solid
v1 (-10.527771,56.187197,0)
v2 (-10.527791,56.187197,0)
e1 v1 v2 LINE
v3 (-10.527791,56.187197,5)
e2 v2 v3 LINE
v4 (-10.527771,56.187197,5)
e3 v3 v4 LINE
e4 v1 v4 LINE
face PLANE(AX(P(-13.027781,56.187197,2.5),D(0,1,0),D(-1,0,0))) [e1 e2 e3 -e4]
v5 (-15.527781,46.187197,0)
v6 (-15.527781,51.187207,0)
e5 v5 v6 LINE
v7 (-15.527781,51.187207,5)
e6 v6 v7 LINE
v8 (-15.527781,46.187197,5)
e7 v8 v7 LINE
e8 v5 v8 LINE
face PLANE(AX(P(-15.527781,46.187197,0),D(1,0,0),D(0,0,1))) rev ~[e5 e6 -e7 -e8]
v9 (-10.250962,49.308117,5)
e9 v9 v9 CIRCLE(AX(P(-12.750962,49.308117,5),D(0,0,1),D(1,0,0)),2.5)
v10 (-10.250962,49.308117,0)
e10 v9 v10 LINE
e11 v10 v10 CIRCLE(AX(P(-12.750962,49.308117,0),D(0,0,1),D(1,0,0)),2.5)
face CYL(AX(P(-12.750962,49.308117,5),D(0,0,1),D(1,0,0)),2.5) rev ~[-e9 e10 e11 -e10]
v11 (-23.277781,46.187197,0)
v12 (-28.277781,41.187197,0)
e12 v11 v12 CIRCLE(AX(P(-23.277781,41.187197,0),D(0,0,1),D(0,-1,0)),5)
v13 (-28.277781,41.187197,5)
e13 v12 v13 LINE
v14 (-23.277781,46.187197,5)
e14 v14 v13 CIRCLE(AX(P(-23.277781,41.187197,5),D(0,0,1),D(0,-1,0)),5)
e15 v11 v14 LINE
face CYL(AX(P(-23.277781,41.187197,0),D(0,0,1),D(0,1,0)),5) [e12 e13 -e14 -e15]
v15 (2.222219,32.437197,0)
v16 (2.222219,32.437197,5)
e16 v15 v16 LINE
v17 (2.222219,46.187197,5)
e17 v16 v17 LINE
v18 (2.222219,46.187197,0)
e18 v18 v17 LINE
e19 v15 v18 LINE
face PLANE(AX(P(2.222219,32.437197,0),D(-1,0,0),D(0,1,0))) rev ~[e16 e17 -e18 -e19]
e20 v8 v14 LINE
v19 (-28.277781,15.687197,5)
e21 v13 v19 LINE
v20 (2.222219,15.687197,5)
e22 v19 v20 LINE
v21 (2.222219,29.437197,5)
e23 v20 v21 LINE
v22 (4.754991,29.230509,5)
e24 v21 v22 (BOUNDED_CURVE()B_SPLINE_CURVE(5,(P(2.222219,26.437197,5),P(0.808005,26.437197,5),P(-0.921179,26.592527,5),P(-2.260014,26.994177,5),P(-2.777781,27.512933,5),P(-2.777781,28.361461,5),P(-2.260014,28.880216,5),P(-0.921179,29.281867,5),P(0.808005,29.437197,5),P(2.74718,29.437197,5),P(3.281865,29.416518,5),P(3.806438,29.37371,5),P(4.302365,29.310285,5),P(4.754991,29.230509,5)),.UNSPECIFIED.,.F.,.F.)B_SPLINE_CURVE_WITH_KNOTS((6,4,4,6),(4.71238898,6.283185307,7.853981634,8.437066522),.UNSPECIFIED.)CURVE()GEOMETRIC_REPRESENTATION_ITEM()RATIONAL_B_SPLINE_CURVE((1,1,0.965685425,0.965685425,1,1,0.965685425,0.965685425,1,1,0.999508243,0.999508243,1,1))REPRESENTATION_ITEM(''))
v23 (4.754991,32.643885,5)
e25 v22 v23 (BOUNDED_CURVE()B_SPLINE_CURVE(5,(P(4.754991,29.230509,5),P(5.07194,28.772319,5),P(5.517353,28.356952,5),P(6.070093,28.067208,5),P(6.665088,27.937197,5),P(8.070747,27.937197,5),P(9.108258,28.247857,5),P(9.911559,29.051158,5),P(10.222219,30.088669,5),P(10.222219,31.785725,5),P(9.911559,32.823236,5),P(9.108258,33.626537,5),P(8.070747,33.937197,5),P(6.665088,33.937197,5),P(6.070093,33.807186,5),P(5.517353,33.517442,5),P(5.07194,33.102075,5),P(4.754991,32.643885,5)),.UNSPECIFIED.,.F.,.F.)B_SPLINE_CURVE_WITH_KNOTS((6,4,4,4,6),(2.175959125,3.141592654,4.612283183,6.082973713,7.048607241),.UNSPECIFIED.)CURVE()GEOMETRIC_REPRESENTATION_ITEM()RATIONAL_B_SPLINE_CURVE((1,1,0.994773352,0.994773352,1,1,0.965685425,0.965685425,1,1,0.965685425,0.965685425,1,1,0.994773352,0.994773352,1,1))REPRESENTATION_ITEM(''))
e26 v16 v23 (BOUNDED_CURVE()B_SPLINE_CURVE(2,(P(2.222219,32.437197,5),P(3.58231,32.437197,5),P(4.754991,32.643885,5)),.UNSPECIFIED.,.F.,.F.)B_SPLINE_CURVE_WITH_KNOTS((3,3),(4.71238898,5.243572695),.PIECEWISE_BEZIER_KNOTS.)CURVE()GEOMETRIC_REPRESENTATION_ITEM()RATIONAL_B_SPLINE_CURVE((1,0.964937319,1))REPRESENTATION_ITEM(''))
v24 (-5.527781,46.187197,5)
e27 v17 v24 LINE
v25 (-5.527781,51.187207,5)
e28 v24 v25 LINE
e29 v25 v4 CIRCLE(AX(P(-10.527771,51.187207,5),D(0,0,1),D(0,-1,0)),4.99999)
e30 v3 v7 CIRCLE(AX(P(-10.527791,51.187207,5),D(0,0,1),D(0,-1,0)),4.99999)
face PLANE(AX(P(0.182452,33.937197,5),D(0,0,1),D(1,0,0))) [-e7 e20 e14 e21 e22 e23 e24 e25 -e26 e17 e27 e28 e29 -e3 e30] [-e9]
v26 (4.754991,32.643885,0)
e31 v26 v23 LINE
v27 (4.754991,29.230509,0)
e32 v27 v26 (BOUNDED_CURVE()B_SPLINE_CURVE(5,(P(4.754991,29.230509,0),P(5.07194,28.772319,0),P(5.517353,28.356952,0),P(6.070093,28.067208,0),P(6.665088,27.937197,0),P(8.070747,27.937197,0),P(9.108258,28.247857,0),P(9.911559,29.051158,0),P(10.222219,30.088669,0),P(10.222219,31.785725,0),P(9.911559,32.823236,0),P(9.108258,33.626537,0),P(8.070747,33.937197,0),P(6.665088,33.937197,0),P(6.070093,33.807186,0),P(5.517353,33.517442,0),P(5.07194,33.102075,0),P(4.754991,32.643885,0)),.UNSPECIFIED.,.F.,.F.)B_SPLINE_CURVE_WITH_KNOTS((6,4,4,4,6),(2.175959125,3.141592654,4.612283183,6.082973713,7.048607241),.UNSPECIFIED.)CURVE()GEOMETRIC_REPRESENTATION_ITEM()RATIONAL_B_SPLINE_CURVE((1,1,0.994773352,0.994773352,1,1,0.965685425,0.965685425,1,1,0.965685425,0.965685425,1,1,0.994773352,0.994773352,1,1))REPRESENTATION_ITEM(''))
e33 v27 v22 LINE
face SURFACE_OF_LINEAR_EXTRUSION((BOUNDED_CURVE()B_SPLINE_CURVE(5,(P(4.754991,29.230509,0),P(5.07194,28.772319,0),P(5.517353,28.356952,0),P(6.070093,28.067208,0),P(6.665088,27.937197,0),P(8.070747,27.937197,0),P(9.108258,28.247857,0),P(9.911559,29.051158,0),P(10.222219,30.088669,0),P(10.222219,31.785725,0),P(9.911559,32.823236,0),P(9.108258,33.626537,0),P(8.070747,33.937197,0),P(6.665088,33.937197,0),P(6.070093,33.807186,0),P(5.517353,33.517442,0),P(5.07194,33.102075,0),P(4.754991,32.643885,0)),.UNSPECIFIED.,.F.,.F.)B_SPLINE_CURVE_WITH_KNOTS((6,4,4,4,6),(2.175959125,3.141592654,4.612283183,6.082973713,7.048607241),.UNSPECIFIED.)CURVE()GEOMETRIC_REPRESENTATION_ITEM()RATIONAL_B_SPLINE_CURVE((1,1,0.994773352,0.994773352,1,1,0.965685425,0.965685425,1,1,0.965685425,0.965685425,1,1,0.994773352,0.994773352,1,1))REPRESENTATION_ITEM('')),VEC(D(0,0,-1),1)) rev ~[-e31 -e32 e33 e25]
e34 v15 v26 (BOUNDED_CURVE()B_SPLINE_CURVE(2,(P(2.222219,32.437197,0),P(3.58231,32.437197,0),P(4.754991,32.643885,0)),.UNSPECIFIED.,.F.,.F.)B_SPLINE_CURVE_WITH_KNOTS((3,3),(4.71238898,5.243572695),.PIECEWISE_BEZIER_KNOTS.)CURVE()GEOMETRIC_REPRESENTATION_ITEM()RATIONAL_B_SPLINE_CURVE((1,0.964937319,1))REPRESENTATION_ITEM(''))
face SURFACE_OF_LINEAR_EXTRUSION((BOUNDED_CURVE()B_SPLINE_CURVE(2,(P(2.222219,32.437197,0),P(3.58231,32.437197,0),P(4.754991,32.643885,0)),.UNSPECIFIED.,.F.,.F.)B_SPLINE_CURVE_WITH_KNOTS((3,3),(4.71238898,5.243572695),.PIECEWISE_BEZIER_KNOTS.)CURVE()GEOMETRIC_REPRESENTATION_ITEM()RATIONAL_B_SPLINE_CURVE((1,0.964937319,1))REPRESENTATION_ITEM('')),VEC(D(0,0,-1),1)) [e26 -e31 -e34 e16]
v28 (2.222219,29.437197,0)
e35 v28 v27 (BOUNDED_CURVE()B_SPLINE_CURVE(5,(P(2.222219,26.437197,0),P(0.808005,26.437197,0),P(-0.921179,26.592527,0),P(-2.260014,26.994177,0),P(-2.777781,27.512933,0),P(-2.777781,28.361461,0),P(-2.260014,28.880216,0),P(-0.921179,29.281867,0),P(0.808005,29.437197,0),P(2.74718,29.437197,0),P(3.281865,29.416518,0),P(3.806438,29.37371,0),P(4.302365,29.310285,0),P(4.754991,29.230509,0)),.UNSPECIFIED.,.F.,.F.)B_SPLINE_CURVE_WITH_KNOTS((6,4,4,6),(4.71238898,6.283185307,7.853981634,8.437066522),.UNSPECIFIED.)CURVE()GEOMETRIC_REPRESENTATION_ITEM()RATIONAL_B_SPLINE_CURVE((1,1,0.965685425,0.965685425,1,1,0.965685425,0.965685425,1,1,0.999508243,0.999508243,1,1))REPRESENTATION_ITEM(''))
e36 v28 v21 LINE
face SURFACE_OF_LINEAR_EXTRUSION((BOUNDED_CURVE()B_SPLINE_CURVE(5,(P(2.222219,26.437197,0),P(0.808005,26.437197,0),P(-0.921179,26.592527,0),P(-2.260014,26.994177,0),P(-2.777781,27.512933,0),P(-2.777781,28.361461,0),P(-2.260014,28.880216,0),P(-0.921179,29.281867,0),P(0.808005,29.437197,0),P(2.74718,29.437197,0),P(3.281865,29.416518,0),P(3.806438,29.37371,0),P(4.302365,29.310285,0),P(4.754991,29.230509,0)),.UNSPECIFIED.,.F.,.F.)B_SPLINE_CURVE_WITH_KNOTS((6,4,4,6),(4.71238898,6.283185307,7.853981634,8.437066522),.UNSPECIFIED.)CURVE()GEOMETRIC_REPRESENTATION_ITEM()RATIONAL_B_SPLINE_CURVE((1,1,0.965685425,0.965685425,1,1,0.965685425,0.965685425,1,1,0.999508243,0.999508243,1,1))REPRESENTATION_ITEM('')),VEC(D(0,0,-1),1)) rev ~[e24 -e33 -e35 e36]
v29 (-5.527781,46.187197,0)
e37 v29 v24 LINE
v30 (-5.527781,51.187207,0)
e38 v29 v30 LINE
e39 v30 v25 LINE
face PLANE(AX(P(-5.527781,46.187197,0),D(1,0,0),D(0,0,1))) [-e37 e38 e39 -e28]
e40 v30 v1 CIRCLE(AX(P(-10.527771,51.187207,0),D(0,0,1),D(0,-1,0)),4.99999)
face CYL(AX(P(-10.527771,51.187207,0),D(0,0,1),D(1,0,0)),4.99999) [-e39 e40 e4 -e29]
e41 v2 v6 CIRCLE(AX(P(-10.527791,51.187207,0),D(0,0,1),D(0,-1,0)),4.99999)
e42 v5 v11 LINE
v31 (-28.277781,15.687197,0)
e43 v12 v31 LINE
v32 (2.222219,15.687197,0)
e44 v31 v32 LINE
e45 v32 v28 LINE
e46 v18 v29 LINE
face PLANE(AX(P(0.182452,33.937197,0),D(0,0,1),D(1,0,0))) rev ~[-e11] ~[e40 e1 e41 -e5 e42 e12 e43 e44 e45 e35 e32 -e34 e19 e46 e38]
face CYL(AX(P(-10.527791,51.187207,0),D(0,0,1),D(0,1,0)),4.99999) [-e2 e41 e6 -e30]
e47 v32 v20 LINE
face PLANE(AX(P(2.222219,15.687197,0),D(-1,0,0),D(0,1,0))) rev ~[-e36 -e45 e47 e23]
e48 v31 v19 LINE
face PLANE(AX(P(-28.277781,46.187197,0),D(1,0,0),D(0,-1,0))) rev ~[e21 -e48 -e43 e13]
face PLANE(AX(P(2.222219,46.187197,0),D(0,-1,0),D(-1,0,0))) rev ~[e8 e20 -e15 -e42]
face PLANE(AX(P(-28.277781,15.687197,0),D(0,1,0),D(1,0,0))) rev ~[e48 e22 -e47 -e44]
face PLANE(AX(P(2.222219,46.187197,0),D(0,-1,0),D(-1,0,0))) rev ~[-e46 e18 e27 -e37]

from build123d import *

# Parameters (mm, degrees)
F1_DEPTH = 5
F2_R     = 5
F3_W     = 5
F3_H     = 5
F4_DEPTH = 10
F5_R     = 4.99999
F6_R     = 2.5
F7_DEPTH = 25


# Not quite as in the source:
# - a fillet or chamfer is up to 0.001 mm smaller than in the source, because OpenCascade refuses the exact size


with BuildPart() as f1:
    # F0 (on Top) → F1 (new body)
    with BuildSketch(Plane.XY):
        with BuildLine():
            Line((2.2222189992, 32.4371969399), (2.2222189992, 33.9371969399))
            Line((2.2222189992, 33.9371969399), (2.2222189992, 35.4371969399))
            add(Edge.make_bspline(
                [(2.2222189992, 35.4371969399), (-2.7777810008, 35.4371969399), (-2.7777810008, 33.9371969399), (-2.7777810008, 32.4371969399), (2.2222189992, 32.4371969399)],
                knots=[1.5707963268, 1.5707963268, 1.5707963268, 3.1415926536, 3.1415926536, 4.7123889804, 4.7123889804, 4.7123889804], degree=2, weights=[1, 0.7071067812, 1, 0.7071067812, 1]))
        make_face()
        with BuildLine():
            add(Edge.make_bspline(
                [(2.2222189992, 32.4371969399), (3.5823095151, 32.4371969399), (4.7549905191, 32.6438848513)],
                knots=[4.7123889804, 4.7123889804, 4.7123889804, 5.2435726948, 5.2435726948, 5.2435726948], degree=2, weights=[1, 0.964937319, 1]))
            Line((2.2222189992, 32.4371969399), (2.2222189992, 30.9371969399))
            Line((2.2222189992, 30.9371969399), (4.2222189992, 30.9371969399))
            add(Edge.make_bspline(
                [(4.7549905191, 32.6438848513), (4.2222189992, 31.8736977196), (4.2222189992, 30.9371969399)],
                knots=[0.9656335287, 0.9656335287, 0.9656335287, 1.5707963268, 1.5707963268, 1.5707963268], degree=2, weights=[1, 0.9545704514, 1]))
        make_face()
        with BuildLine():
            Line((2.2222189992, 30.9371969399), (2.2222189992, 32.4371969399))
            add(Edge.make_bspline(
                [(2.2222189992, 35.4371969399), (-2.7777810008, 35.4371969399), (-2.7777810008, 33.9371969399), (-2.7777810008, 32.4371969399), (2.2222189992, 32.4371969399)],
                knots=[1.5707963268, 1.5707963268, 1.5707963268, 3.1415926536, 3.1415926536, 4.7123889804, 4.7123889804, 4.7123889804], degree=2, weights=[1, 0.7071067812, 1, 0.7071067812, 1]))
            Line((2.2222189992, 35.4371969399), (2.2222189992, 46.1871969399))
            Line((2.2222189992, 46.1871969399), (-28.2777810008, 46.1871969399))
            Line((-28.2777810008, 46.1871969399), (-28.2777810008, 15.6871969399))
            Line((-28.2777810008, 15.6871969399), (2.2222189992, 15.6871969399))
            Line((2.2222189992, 15.6871969399), (2.2222189992, 26.4371969399))
            add(Edge.make_bspline(
                [(2.2222189992, 29.4371969399), (-2.7777810008, 29.4371969399), (-2.7777810008, 27.9371969399), (-2.7777810008, 26.4371969399), (2.2222189992, 26.4371969399)],
                knots=[4.7123889804, 4.7123889804, 4.7123889804, 6.2831853072, 6.2831853072, 7.853981634, 7.853981634, 7.853981634], degree=2, weights=[1, 0.7071067812, 1, 0.7071067812, 1]))
            Line((2.2222189992, 29.4371969399), (2.2222189992, 30.9371969399))
        make_face()
        with BuildLine():
            Line((4.2222189992, 30.9371969399), (2.2222189992, 30.9371969399))
            Line((2.2222189992, 30.9371969399), (2.2222189992, 29.4371969399))
            add(Edge.make_bspline(
                [(4.7549905191, 29.2305090285), (3.5823095151, 29.4371969399), (2.2222189992, 29.4371969399)],
                knots=[4.181205266, 4.181205266, 4.181205266, 4.7123889804, 4.7123889804, 4.7123889804], degree=2, weights=[1, 0.964937319, 1]))
            add(Edge.make_bspline(
                [(4.2222189992, 30.9371969399), (4.2222189992, 30.0006961603), (4.7549905191, 29.2305090285)],
                knots=[1.5707963268, 1.5707963268, 1.5707963268, 2.1759591249, 2.1759591249, 2.1759591249], degree=2, weights=[1, 0.9545704514, 1]))
        make_face()
        with BuildLine():
            add(Edge.make_bspline(
                [(7.2222189992, 33.9371969399), (5.6496300407, 33.9371969399), (4.7549905191, 32.6438848513)],
                knots=[0, 0, 0, 0.9656335287, 0.9656335287, 0.9656335287], degree=2, weights=[1, 0.8856906826, 1]))
            add(Edge.make_bspline(
                [(4.7549905191, 32.6438848513), (7.2222189992, 33.0787399396), (7.2222189992, 33.9371969399)],
                knots=[5.2435726948, 5.2435726948, 5.2435726948, 6.2831853072, 6.2831853072, 6.2831853072], degree=2, weights=[1, 0.867915406, 1]))
        make_face()
        with BuildLine():
            add(Edge.make_bspline(
                [(4.7549905191, 32.6438848513), (7.2222189992, 33.0787399396), (7.2222189992, 33.9371969399)],
                knots=[5.2435726948, 5.2435726948, 5.2435726948, 6.2831853072, 6.2831853072, 6.2831853072], degree=2, weights=[1, 0.867915406, 1]))
            add(Edge.make_bspline(
                [(4.7549905191, 32.6438848513), (4.2222189992, 31.8736977196), (4.2222189992, 30.9371969399)],
                knots=[0.9656335287, 0.9656335287, 0.9656335287, 1.5707963268, 1.5707963268, 1.5707963268], degree=2, weights=[1, 0.9545704514, 1]))
            Line((4.2222189992, 30.9371969399), (7.2222189992, 30.9371969399))
            Line((7.2222189992, 30.9371969399), (7.2222189992, 33.9371969399))
        make_face()
        with BuildLine():
            add(Edge.make_bspline(
                [(7.2222189992, 27.9371969399), (10.2222189992, 27.9371969399), (10.2222189992, 30.9371969399), (10.2222189992, 33.9371969399), (7.2222189992, 33.9371969399)],
                knots=[3.1415926536, 3.1415926536, 3.1415926536, 4.7123889804, 4.7123889804, 6.2831853072, 6.2831853072, 6.2831853072], degree=2, weights=[1, 0.7071067812, 1, 0.7071067812, 1]))
            Line((7.2222189992, 33.9371969399), (7.2222189992, 30.9371969399))
            Line((7.2222189992, 30.9371969399), (7.2222189992, 27.9371969399))
        make_face()
        with BuildLine():
            Line((2.2222189992, 27.9371969399), (2.2222189992, 29.4371969399))
            add(Edge.make_bspline(
                [(2.2222189992, 29.4371969399), (-2.7777810008, 29.4371969399), (-2.7777810008, 27.9371969399), (-2.7777810008, 26.4371969399), (2.2222189992, 26.4371969399)],
                knots=[4.7123889804, 4.7123889804, 4.7123889804, 6.2831853072, 6.2831853072, 7.853981634, 7.853981634, 7.853981634], degree=2, weights=[1, 0.7071067812, 1, 0.7071067812, 1]))
            Line((2.2222189992, 26.4371969399), (2.2222189992, 27.9371969399))
        make_face()
        with BuildLine():
            Line((7.2222189992, 30.9371969399), (4.2222189992, 30.9371969399))
            add(Edge.make_bspline(
                [(4.2222189992, 30.9371969399), (4.2222189992, 30.0006961603), (4.7549905191, 29.2305090285)],
                knots=[1.5707963268, 1.5707963268, 1.5707963268, 2.1759591249, 2.1759591249, 2.1759591249], degree=2, weights=[1, 0.9545704514, 1]))
            add(Edge.make_bspline(
                [(7.2222189992, 27.9371969399), (7.2222189992, 28.7956539402), (4.7549905191, 29.2305090285)],
                knots=[3.1415926536, 3.1415926536, 3.1415926536, 4.181205266, 4.181205266, 4.181205266], degree=2, weights=[1, 0.867915406, 1]))
            Line((7.2222189992, 27.9371969399), (7.2222189992, 30.9371969399))
        make_face()
        with BuildLine():
            add(Edge.make_bspline(
                [(4.7549905191, 29.2305090285), (5.6496300407, 27.9371969399), (7.2222189992, 27.9371969399)],
                knots=[2.1759591249, 2.1759591249, 2.1759591249, 3.1415926536, 3.1415926536, 3.1415926536], degree=2, weights=[1, 0.8856906826, 1]))
            add(Edge.make_bspline(
                [(7.2222189992, 27.9371969399), (7.2222189992, 28.7956539402), (4.7549905191, 29.2305090285)],
                knots=[3.1415926536, 3.1415926536, 3.1415926536, 4.181205266, 4.181205266, 4.181205266], degree=2, weights=[1, 0.867915406, 1]))
        make_face()
    extrude(amount=F1_DEPTH)

    # F2
    f2_edges = [f1.edges().sort_by_distance(p)[0] for p in [
        (-28.277781, 46.187197, 2.5),
    ]]
    fillet(f2_edges, radius=F2_R)

    # F3 (on face) → F4 (join)
    with BuildSketch(Plane(origin=(0, 46.1871969399, 0), x_dir=(-1, 0, 0), z_dir=(0, 1, 0))):
        with Locations((13.0277810008, 2.5)):
            Rectangle(F3_W, F3_H)
        with Locations((8.0277810008, 2.5)):
            Rectangle(F3_W, F3_H)
    extrude(amount=F4_DEPTH)

    # F5 (radius 5 in the source; OpenCascade refuses exactly that, so slightly less here)
    f5_edges = [f1.edges().sort_by_distance(p)[0] for p in [
        (-15.527781, 56.187197, 2.5),
        (-5.527781, 56.187197, 2.5),
    ]]
    fillet(f5_edges, radius=F5_R)

    # F6 (on face) → F7 (cut)
    with BuildSketch(Plane.XY.offset(5)):
        with Locations((-12.7509618178, 49.3081174791)):
            Circle(F6_R)
    extrude(amount=-F7_DEPTH, mode=Mode.SUBTRACT)


solid = f1.part
